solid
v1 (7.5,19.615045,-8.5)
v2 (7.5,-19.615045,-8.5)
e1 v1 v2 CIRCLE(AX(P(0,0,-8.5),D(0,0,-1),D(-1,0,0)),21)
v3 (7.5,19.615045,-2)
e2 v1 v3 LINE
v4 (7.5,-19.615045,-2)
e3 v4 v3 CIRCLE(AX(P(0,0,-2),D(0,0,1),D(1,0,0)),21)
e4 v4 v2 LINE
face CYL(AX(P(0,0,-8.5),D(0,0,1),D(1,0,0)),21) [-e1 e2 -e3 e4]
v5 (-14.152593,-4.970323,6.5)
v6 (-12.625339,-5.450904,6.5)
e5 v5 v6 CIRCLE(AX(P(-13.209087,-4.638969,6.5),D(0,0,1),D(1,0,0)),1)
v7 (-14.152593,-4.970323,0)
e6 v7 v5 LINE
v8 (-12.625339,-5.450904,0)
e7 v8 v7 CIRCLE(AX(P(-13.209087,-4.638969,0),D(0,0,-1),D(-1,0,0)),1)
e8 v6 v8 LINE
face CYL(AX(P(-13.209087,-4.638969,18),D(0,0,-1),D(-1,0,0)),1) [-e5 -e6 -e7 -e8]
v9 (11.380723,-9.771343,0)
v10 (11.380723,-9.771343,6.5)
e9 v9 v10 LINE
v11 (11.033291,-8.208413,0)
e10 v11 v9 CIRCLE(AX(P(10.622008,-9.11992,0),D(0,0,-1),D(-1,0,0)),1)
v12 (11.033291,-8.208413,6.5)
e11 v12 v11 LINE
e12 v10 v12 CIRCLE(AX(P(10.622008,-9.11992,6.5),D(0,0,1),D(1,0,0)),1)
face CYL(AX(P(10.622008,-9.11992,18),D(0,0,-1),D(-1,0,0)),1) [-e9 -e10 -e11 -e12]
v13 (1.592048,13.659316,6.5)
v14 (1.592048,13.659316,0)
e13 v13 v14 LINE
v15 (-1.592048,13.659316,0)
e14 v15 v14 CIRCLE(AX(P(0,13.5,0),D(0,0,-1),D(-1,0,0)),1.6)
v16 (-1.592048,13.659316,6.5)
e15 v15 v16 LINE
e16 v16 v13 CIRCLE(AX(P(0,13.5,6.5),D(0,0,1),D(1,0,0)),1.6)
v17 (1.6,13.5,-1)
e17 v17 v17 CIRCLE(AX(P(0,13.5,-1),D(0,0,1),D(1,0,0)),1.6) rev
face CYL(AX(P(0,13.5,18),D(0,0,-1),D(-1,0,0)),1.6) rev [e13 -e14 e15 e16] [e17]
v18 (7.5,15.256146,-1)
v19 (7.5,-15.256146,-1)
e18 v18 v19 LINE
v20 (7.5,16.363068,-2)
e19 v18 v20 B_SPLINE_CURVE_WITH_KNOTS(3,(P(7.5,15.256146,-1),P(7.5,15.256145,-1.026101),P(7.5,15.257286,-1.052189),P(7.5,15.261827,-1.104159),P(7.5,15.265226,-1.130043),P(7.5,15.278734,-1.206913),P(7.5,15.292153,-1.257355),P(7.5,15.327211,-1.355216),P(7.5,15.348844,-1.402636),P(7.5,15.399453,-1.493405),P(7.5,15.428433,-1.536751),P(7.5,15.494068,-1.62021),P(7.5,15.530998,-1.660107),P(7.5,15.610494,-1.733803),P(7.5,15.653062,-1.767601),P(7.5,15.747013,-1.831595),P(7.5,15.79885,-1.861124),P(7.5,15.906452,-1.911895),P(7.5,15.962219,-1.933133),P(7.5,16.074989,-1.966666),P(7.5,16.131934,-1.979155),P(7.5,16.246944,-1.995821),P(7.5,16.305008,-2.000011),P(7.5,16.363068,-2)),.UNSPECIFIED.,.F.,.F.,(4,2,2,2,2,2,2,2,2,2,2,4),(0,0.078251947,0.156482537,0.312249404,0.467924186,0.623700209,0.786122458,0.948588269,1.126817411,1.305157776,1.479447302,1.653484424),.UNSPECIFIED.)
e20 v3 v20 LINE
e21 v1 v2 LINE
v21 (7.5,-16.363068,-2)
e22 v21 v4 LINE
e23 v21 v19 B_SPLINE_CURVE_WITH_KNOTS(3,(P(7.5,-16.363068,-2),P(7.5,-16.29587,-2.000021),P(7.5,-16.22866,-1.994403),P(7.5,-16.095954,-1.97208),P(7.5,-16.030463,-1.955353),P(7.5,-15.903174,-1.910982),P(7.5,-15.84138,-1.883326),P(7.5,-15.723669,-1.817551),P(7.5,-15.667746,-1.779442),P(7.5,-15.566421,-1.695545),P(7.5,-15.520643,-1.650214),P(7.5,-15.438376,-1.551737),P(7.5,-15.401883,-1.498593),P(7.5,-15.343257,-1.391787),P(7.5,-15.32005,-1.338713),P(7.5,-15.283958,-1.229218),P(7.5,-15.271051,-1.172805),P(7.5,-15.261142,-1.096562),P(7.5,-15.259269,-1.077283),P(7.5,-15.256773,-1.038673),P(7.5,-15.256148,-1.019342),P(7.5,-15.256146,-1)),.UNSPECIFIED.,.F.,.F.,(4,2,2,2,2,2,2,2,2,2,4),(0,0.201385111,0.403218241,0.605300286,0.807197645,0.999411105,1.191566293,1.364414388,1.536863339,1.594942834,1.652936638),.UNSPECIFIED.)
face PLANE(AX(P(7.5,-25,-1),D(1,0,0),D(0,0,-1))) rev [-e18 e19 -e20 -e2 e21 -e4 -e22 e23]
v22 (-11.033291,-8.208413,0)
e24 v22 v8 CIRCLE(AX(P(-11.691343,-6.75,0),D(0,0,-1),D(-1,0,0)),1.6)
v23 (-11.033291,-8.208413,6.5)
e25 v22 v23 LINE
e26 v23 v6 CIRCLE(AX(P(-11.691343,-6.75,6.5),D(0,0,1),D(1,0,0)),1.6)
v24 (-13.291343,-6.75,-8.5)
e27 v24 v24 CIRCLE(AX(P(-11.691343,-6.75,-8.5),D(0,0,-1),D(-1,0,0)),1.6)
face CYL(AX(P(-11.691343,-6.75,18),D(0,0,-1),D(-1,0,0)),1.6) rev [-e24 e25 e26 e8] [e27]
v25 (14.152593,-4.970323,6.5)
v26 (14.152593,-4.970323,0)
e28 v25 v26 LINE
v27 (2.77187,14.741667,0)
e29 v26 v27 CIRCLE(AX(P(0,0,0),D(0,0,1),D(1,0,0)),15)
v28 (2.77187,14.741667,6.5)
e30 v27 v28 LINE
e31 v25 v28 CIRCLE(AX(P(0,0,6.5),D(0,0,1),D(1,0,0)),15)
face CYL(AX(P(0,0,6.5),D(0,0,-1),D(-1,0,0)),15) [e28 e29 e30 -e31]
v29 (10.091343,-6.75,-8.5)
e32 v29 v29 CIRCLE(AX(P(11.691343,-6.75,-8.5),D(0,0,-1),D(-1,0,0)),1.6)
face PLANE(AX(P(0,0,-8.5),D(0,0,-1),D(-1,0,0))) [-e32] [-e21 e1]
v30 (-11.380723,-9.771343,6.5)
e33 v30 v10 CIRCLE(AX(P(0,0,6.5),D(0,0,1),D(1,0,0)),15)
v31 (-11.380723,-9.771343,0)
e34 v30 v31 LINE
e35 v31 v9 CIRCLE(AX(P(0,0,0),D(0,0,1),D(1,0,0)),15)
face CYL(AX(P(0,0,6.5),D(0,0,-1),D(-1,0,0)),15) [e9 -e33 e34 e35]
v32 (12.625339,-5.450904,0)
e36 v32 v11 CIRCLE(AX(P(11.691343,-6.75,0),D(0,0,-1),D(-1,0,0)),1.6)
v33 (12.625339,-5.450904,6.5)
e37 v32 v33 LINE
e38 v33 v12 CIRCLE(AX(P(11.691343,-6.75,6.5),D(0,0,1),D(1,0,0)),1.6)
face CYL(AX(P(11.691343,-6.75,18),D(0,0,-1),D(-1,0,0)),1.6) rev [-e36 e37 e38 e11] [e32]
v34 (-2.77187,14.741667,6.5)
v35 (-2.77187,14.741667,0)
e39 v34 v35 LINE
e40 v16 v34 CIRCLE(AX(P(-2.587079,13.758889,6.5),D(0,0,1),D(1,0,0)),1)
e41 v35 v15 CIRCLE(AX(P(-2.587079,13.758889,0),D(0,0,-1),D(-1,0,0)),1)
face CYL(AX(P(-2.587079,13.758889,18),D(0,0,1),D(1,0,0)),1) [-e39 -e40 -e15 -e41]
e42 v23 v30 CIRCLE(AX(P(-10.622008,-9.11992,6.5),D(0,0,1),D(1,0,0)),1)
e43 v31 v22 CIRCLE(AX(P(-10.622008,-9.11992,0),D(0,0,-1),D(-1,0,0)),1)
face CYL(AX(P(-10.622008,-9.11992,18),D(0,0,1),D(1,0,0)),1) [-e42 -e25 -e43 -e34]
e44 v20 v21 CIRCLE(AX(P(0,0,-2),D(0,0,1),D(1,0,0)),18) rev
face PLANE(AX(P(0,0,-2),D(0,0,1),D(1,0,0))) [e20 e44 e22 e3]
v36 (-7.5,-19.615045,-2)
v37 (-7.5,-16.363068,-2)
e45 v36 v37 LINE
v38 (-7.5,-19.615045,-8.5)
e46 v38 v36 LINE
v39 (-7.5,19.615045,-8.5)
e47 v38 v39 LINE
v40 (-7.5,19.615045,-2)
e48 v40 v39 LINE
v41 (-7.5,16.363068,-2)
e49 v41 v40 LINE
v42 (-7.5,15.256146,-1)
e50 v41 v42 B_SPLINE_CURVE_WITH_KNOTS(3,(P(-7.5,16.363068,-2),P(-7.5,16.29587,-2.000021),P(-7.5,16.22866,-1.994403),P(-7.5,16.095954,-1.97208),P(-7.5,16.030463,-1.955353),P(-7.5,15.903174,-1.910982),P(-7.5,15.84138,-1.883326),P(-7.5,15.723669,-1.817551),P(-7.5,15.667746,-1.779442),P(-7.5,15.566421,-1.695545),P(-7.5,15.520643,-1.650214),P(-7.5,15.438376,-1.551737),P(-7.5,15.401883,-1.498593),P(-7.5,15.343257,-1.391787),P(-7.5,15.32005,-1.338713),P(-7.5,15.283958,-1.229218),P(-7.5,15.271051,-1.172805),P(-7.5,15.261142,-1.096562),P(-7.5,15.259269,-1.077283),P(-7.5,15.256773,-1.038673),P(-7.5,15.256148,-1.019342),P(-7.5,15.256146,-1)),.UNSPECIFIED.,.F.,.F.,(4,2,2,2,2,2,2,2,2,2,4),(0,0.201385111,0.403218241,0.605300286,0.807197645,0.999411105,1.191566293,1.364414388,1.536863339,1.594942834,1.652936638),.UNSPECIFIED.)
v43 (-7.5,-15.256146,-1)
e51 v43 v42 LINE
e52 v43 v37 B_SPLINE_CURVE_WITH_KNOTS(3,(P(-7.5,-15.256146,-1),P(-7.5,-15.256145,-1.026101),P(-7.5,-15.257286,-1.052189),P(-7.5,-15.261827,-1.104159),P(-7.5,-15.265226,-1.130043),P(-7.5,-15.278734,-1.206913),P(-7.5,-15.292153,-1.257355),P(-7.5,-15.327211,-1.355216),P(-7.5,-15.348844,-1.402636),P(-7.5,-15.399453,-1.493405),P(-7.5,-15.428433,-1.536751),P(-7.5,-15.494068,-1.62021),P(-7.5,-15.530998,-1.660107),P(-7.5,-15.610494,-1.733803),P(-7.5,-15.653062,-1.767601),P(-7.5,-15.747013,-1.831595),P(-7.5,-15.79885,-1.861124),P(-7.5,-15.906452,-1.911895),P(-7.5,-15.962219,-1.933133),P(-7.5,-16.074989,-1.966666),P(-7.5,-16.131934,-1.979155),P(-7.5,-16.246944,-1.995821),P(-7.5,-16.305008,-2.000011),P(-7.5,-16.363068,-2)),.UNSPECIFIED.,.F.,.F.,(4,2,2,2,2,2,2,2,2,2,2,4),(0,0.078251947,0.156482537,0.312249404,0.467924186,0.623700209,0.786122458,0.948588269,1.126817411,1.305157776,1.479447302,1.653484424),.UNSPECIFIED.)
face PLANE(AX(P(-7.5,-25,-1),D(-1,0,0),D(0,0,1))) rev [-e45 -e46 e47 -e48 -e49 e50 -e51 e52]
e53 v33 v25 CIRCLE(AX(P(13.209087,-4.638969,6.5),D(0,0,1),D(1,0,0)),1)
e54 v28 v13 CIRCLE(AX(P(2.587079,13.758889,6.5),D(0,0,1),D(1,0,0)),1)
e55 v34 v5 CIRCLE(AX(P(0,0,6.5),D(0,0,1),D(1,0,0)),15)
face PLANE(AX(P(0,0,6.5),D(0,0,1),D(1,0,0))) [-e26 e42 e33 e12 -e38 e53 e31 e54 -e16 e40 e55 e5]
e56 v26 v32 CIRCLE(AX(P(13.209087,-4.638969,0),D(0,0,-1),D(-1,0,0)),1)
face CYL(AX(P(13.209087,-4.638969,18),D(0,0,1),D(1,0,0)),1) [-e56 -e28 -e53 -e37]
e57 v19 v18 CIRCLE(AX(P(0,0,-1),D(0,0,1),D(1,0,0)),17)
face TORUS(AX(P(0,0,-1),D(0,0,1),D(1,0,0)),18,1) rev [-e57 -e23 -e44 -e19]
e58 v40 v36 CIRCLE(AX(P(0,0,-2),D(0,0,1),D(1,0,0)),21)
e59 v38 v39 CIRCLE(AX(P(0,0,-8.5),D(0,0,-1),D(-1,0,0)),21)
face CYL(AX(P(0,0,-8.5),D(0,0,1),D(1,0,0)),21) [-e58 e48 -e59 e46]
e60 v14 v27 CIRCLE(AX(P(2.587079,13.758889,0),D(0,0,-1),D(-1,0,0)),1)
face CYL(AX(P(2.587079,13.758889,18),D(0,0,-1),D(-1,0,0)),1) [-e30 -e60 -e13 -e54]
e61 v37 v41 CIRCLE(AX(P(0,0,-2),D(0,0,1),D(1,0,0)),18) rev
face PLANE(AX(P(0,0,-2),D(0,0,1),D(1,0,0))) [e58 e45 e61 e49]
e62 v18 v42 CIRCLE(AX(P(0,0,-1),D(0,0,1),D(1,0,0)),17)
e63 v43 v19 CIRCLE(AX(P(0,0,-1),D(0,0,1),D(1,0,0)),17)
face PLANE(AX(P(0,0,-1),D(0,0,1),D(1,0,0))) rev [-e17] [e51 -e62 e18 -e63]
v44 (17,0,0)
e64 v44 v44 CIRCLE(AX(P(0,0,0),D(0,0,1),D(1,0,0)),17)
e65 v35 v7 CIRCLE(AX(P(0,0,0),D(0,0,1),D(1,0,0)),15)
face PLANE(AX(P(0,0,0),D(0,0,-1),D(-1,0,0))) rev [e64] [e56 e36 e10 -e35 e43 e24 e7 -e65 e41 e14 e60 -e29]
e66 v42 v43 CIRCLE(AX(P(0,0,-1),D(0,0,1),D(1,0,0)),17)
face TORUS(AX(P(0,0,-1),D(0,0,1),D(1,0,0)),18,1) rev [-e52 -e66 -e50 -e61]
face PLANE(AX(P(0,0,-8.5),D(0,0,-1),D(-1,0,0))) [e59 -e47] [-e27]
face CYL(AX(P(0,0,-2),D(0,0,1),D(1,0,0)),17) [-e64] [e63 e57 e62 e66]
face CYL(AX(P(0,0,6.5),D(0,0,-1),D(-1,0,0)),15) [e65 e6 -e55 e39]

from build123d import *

# Parameters (mm, degrees)
SKETCH_1_R          = 15
EXTRUDE_1_DEPTH     = 6.5
SKETCH_2_R          = 21
EXTRUDE_2_DEPTH     = 8.5
SKETCH_3_R          = 1.6
CUT_EXTRUDE_1_DEPTH = 26.5
SKETCH_6_W          = 15
SKETCH_6_H          = 50
CUT_EXTRUDE_3_DEPTH = 7.5
FILLET_1_R          = 1
SKETCH_7_R          = 21
SKETCH_7_R_2        = 17
CUT_EXTRUDE_4_DEPTH = 2
FILLET_2_R          = 1


with BuildPart() as part:
    # 草图1 → 凸台-拉伸1 (new body)
    with BuildSketch(Plane.XY):
        with Locations(Location((0, 0, 0), (0, 0, 180))):
            Circle(SKETCH_1_R)
    extrude(amount=EXTRUDE_1_DEPTH)

    # 草图2 → 凸台-拉伸2 (add)
    with BuildSketch(Plane(origin=(0, 0, 0), x_dir=(-1, 0, 0), z_dir=(0, 0, -1))):
        Circle(SKETCH_2_R)
    extrude(amount=EXTRUDE_2_DEPTH)

    # 草图3 → 切除-拉伸1 (cut)
    with BuildSketch(Plane(origin=(0, 0, -8.5), x_dir=(-1, 0, 0), z_dir=(0, 0, -1))):
        with Locations((0, 13.5)):
            Circle(SKETCH_3_R)
        with Locations((11.691342951, -6.75)):
            Circle(SKETCH_3_R)
        with Locations((-11.691342951, -6.75)):
            Circle(SKETCH_3_R)
    extrude(amount=-CUT_EXTRUDE_1_DEPTH, mode=Mode.SUBTRACT)

    # 草图6 → 切除-拉伸3 (cut)
    with BuildSketch(Plane(origin=(0, 0, -8.5), x_dir=(-1, 0, 0), z_dir=(0, 0, -1))):
        Rectangle(SKETCH_6_W, SKETCH_6_H)
    extrude(amount=-CUT_EXTRUDE_3_DEPTH, mode=Mode.SUBTRACT)

    # 圆角1
    # the kernel refuses this fillet: 1 mm, written as the material it takes off along each edge
    with BuildSketch(Plane(origin=(-0.586781578, 14.988518519, 11.997469711), x_dir=(-0.6032076462892466, -0.7975841870662852, 0), z_dir=(0, 0, -1)), Plane(origin=(-12.687047013, -8.002427012, 11.997469711), x_dir=(0.9923319908008487, -0.1236010519098617, 0), z_dir=(0, 0, -1)), Plane(origin=(13.273828591, -6.986091506, 11.997469711), x_dir=(-0.38912434451096145, 0.9211852389768925, 0), z_dir=(0, 0, -1))) as fillet_1_piece_1:
        with BuildLine():
            CenterArc((2.187327708, 0.853683412), FILLET_1_R, 132.251057191, 106.363529617)
            ThreePointArc((1.514947242, 1.593889134), (0.728226426, 0.824743212), (0, 0))
            ThreePointArc((0, 0), (0.833267698, 0.23410654), (1.666535396, 0))
        make_face()
    extrude(amount=11.997469711, mode=Mode.SUBTRACT)
    with BuildSketch(Plane(origin=(0.586781578, 14.988518519, 11.997469711), x_dir=(0.6032076462892473, -0.7975841870662848, 0), z_dir=(0, 0, -1))) as fillet_1_piece_2:
        with BuildLine():
            CenterArc((2.187327708, -0.853683412), FILLET_1_R, 121.385413192, 106.363529617)
            ThreePointArc((1.514947242, -1.593889134), (0.728226426, -0.824743212), (0, 0))
            ThreePointArc((0, 0), (0.833267698, -0.23410654), (1.666535396, 0))
        make_face()
    extrude(amount=11.997469711, mode=Mode.SUBTRACT)
    with BuildSketch(Plane(origin=(-13.273828591, -6.986091506, 11.997469711), x_dir=(-0.3996221607245731, 0.9166799488686461, 0), z_dir=(0, 0, -1)), Plane(origin=(12.687047013, -8.002427012, 11.997469711), x_dir=(-0.594057042497704, -0.8044229175370883, 0), z_dir=(0, 0, -1))) as fillet_1_piece_3:
        with BuildLine():
            CenterArc((2.125688288, 0.997309966), FILLET_1_R, 167.839997769, 106.363529617)
            ThreePointArc((1.148125108, 1.207952385), (0.743749651, 0.442693331), (0, 0))
            ThreePointArc((0, 0), (1.099493942, -0.040350503), (2.198987885, 0))
        make_face()
    extrude(amount=11.997469711, mode=Mode.SUBTRACT)

    # 草图7 → 切除-拉伸4 (cut)
    with BuildSketch(Plane.XY):
        Circle(SKETCH_7_R)
        Circle(SKETCH_7_R_2, mode=Mode.SUBTRACT)
    extrude(amount=-CUT_EXTRUDE_4_DEPTH, mode=Mode.SUBTRACT)

    # 圆角2
    fillet_2_edges = [part.edges().sort_by_distance(p)[0] for p in [
        (-17, 0, -2),
        (14.43086969, -8.986100378, -2),
    ]]
    fillet(fillet_2_edges, radius=FILLET_2_R)


solid = part.part
